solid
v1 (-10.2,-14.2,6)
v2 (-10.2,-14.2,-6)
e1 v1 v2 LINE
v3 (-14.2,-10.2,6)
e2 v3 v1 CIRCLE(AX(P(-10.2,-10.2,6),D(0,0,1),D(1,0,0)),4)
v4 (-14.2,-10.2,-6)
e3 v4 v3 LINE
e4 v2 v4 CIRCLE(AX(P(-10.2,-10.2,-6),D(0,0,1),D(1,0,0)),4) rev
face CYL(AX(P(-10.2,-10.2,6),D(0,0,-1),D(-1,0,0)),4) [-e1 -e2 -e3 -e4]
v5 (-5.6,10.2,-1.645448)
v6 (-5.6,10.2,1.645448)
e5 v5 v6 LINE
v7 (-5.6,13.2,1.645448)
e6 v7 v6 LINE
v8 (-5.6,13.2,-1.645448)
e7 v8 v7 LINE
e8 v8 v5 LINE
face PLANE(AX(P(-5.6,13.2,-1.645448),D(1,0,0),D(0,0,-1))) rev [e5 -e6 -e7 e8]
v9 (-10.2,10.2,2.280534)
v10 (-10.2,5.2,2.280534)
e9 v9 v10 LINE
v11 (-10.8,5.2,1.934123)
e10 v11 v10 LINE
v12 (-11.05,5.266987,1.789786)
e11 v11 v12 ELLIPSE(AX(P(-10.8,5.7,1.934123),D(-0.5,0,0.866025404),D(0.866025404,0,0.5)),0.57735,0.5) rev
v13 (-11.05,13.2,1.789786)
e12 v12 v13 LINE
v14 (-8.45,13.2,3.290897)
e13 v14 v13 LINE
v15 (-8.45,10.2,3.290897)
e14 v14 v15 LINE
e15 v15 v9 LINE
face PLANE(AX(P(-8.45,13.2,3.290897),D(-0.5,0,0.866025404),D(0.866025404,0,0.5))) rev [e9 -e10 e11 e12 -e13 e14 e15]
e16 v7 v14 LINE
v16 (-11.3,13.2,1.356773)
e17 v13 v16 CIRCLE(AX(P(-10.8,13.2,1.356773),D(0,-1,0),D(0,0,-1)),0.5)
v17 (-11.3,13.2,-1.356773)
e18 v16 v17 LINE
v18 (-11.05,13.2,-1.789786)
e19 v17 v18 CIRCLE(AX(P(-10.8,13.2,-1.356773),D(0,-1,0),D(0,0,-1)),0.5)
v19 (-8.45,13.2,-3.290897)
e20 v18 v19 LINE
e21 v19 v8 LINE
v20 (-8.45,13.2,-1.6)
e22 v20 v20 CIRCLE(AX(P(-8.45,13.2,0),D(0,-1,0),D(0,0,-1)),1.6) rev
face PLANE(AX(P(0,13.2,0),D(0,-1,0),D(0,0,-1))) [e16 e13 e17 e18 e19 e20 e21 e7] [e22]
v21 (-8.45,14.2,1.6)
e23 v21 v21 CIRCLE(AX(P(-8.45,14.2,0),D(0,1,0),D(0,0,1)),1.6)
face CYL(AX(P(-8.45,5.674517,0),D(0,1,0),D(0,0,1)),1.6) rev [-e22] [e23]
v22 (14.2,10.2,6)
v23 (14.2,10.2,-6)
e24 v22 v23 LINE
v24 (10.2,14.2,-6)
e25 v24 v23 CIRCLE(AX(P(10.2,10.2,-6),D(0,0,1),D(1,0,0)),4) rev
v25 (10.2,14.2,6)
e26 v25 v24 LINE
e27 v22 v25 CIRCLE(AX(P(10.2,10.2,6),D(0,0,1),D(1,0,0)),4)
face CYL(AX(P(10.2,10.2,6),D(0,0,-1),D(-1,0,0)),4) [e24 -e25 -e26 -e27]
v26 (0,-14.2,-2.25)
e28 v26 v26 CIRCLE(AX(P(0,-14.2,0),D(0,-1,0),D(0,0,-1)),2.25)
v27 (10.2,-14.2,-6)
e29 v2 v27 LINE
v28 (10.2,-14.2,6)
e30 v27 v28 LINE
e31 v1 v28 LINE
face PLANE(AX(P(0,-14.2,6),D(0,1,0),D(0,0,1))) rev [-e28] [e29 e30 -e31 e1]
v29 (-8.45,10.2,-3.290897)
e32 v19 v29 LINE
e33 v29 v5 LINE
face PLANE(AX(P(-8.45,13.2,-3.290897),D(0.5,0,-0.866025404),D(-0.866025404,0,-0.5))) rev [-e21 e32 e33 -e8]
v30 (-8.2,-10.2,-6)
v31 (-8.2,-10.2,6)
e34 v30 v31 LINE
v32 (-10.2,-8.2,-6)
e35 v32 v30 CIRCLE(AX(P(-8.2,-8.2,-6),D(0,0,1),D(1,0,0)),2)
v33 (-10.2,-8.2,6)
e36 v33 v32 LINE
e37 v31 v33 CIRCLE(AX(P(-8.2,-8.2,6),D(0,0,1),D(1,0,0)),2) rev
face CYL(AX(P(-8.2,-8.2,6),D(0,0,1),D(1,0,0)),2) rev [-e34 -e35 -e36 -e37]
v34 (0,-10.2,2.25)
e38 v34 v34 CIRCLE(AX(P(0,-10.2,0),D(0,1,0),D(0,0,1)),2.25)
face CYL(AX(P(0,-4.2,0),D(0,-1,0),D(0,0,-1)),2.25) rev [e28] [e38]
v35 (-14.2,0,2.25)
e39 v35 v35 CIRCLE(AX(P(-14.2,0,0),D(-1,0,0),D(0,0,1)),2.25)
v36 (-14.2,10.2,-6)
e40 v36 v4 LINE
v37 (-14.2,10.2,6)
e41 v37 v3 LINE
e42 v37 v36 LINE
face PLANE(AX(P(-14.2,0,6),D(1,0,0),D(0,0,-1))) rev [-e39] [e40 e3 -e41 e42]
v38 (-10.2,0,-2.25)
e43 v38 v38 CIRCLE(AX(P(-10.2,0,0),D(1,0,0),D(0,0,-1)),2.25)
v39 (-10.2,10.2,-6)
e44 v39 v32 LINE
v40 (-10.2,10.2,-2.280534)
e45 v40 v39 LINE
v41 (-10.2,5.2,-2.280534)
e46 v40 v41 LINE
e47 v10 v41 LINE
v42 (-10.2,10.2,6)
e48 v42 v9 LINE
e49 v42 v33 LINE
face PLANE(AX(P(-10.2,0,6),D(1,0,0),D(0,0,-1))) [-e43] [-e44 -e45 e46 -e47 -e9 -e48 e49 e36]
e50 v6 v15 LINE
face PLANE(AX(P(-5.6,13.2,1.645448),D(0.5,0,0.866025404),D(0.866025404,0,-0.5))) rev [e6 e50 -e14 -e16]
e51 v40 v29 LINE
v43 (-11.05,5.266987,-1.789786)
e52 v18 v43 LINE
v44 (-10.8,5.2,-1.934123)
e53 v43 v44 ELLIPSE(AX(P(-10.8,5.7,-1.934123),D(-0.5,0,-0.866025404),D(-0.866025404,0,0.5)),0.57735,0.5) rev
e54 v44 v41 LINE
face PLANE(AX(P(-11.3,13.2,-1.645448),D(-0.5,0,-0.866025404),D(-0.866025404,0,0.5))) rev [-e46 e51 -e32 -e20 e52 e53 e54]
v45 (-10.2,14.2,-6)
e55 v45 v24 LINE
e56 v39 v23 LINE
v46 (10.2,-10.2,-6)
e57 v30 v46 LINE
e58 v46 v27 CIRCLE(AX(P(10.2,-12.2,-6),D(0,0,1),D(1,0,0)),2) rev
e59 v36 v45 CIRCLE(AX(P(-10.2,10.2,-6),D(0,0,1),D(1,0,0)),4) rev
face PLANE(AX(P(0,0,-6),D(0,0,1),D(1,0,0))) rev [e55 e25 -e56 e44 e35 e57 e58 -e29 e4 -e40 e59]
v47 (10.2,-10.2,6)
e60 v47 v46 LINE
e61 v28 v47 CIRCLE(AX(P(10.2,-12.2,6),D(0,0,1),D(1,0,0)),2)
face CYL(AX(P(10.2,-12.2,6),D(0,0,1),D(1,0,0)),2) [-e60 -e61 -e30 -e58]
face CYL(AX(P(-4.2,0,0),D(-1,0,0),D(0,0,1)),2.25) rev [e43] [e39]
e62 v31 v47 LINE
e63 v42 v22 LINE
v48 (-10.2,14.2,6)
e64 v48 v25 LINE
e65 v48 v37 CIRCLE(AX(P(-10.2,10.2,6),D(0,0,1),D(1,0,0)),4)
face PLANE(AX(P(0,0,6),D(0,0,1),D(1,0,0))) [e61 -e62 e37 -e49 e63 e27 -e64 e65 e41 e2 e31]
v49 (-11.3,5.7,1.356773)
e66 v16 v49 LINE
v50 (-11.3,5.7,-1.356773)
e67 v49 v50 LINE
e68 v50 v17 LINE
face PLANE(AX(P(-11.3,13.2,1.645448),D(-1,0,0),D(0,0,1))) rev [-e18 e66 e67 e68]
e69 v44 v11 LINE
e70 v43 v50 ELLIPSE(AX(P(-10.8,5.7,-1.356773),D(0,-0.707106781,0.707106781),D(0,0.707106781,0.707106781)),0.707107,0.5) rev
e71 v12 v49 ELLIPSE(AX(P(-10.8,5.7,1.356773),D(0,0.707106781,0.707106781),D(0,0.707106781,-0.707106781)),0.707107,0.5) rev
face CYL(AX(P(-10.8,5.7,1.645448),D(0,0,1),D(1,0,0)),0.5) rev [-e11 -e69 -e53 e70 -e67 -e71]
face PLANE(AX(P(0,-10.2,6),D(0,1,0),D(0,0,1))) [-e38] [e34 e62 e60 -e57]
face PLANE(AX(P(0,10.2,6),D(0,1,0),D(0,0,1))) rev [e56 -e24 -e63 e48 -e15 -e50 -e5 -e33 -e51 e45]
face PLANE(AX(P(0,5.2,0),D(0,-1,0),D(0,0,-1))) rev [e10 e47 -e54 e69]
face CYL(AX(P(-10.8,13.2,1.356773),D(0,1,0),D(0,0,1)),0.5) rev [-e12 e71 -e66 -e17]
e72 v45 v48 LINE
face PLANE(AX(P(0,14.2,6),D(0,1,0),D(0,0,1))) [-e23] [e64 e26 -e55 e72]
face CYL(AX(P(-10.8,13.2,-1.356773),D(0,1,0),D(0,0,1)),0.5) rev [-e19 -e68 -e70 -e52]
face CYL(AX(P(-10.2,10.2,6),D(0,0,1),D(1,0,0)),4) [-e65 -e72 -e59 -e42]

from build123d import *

# Parameters (mm, degrees)
RESSALTO_EXTRUS_O1_DEPTH = 6
ESBO_O3_R                = 1.6
CORTE_EXTRUS_O1_DEPTH    = 4
CORTE_EXTRUS_O2_DEPTH    = 3
CORTE_EXTRUS_O3_DEPTH    = 5
FILETE1_R                = 0.5
FILETE2_R                = 4
FILETE3_R                = 2
ESBO_O6_R                = 2.25
CORTE_EXTRUS_O4_DEPTH    = 10
ESBO_O7_R                = 2.25
CORTE_EXTRUS_O5_DEPTH    = 10


# Some blends are built 0.0001 mm under size
with BuildPart() as part:
    # Esboço1 → Ressalto-extrusão1 (new, symmetric)
    with BuildSketch(Plane.XY):
        Polygon((14.2, 14.2), (-14.2, 14.2), (-14.2, -14.2), (14.2, -14.2), (14.2, -10.2), (10.2, -10.2), (-10.2, -10.2), (-10.2, 10.2), (10.2, 10.2), (14.2, 10.2), align=None)
    extrude(amount=RESSALTO_EXTRUS_O1_DEPTH, both=True)

    # Esboço3 → Corte-extrusão1 (cut)
    with BuildSketch(Plane(origin=(0, 14.2, 0), x_dir=(1, 0, 0), z_dir=(0, 1, 0))):
        with Locations(Location((-8.45, 0, 0), (0, 0, 270))):
            Circle(ESBO_O3_R)
    extrude(amount=-CORTE_EXTRUS_O1_DEPTH, mode=Mode.SUBTRACT)

    # Esboço4 → Corte-extrusão2 (cut)
    with BuildSketch(Plane.XZ.offset(-10.2)):
        Polygon((-8.45, 3.290896534), (-11.3, 1.645448267), (-11.3, -1.645448267), (-8.45, -3.290896534), (-5.6, -1.645448267), (-5.6, 1.645448267), align=None)
    extrude(amount=-CORTE_EXTRUS_O2_DEPTH, mode=Mode.SUBTRACT)

    # Esboço5 → Corte-extrusão3 (cut)
    with BuildSketch(Plane.XZ.offset(-10.2)):
        Polygon((-11.3, -1.645448267), (-10.2, -2.280533563), (-8.45, -3.290896534), (-5.6, -1.645448267), (-5.6, 1.645448267), (-8.45, 3.290896534), (-10.2, 2.280533563), (-11.3, 1.645448267), align=None)
    extrude(amount=CORTE_EXTRUS_O3_DEPTH, mode=Mode.SUBTRACT)

    # Filete1
    filete1_edges = [part.edges().sort_by_distance(p)[0] for p in [
        (-11.3, 9.2, -1.645448267),
        (-11.3, 9.2, 1.645448267),
        (-11.3, 5.2, 0),
    ]]
    fillet(filete1_edges, radius=FILETE1_R)

    # Filete2
    filete2_edges = [part.edges().sort_by_distance(p)[0] for p in [
        (-14.2, -14.2, 0),
        (-14.2, 14.2, 0),
        (14.2, 14.2, 0),
        (14.2, -14.2, 0),
    ]]
    fillet(filete2_edges, radius=FILETE2_R - 0.0001)  # a hair under: the kernel refuses the full size

    # Filete3
    # the kernel refuses this fillet: 2 mm, written as the material it adds along each edge
    with BuildSketch(Plane(origin=(-10.2, -10.2, -6), x_dir=(0, 1, 0), z_dir=(0, 0, 1))) as filete3_piece_1:
        with BuildLine():
            CenterArc((FILETE3_R, -FILETE3_R), FILETE3_R, 90, 90)
            Line((0, -FILETE3_R), (0, 0))
            Line((0, 0), (FILETE3_R, 0))
        make_face()
    extrude(amount=12)
    # the kernel refuses this fillet: 2 mm, written as the material it takes off along each edge
    with BuildSketch(Plane(origin=(14.2, -10.2, -20.141946005), x_dir=(-1, 0, 0), z_dir=(0, 0, 1))) as filete3_2_piece_1:
        with BuildLine():
            CenterArc((3.999896367, 2), FILETE3_R, 90.000104073, 179.999895927)
            Line((3.999892734, 4), (3.999892371, 4.2))
            ThreePointArc((3.999892371, 4.2), (-0.2, 0.0001), (-0.2, 0))
            Line((-0.2, 0), (0, -0.2))
            Line((0, -0.2), (3.999896367, -0.2))
            Line((3.999896367, -0.2), (3.999896367, 0))
        make_face()
    extrude(amount=40.283892009, mode=Mode.SUBTRACT)

    # Esboço6 → Corte-extrusão4 (cut)
    with BuildSketch(Plane.ZY.offset(14.2)):
        Circle(ESBO_O6_R)
    extrude(amount=-CORTE_EXTRUS_O4_DEPTH, mode=Mode.SUBTRACT)

    # Esboço7 → Corte-extrusão5 (cut)
    with BuildSketch(Plane.XZ.offset(14.2)):
        with Locations(Location((0, 0, 0), (0, 0, 270))):
            Circle(ESBO_O7_R)
    extrude(amount=-CORTE_EXTRUS_O5_DEPTH, mode=Mode.SUBTRACT)


solid = part.part
